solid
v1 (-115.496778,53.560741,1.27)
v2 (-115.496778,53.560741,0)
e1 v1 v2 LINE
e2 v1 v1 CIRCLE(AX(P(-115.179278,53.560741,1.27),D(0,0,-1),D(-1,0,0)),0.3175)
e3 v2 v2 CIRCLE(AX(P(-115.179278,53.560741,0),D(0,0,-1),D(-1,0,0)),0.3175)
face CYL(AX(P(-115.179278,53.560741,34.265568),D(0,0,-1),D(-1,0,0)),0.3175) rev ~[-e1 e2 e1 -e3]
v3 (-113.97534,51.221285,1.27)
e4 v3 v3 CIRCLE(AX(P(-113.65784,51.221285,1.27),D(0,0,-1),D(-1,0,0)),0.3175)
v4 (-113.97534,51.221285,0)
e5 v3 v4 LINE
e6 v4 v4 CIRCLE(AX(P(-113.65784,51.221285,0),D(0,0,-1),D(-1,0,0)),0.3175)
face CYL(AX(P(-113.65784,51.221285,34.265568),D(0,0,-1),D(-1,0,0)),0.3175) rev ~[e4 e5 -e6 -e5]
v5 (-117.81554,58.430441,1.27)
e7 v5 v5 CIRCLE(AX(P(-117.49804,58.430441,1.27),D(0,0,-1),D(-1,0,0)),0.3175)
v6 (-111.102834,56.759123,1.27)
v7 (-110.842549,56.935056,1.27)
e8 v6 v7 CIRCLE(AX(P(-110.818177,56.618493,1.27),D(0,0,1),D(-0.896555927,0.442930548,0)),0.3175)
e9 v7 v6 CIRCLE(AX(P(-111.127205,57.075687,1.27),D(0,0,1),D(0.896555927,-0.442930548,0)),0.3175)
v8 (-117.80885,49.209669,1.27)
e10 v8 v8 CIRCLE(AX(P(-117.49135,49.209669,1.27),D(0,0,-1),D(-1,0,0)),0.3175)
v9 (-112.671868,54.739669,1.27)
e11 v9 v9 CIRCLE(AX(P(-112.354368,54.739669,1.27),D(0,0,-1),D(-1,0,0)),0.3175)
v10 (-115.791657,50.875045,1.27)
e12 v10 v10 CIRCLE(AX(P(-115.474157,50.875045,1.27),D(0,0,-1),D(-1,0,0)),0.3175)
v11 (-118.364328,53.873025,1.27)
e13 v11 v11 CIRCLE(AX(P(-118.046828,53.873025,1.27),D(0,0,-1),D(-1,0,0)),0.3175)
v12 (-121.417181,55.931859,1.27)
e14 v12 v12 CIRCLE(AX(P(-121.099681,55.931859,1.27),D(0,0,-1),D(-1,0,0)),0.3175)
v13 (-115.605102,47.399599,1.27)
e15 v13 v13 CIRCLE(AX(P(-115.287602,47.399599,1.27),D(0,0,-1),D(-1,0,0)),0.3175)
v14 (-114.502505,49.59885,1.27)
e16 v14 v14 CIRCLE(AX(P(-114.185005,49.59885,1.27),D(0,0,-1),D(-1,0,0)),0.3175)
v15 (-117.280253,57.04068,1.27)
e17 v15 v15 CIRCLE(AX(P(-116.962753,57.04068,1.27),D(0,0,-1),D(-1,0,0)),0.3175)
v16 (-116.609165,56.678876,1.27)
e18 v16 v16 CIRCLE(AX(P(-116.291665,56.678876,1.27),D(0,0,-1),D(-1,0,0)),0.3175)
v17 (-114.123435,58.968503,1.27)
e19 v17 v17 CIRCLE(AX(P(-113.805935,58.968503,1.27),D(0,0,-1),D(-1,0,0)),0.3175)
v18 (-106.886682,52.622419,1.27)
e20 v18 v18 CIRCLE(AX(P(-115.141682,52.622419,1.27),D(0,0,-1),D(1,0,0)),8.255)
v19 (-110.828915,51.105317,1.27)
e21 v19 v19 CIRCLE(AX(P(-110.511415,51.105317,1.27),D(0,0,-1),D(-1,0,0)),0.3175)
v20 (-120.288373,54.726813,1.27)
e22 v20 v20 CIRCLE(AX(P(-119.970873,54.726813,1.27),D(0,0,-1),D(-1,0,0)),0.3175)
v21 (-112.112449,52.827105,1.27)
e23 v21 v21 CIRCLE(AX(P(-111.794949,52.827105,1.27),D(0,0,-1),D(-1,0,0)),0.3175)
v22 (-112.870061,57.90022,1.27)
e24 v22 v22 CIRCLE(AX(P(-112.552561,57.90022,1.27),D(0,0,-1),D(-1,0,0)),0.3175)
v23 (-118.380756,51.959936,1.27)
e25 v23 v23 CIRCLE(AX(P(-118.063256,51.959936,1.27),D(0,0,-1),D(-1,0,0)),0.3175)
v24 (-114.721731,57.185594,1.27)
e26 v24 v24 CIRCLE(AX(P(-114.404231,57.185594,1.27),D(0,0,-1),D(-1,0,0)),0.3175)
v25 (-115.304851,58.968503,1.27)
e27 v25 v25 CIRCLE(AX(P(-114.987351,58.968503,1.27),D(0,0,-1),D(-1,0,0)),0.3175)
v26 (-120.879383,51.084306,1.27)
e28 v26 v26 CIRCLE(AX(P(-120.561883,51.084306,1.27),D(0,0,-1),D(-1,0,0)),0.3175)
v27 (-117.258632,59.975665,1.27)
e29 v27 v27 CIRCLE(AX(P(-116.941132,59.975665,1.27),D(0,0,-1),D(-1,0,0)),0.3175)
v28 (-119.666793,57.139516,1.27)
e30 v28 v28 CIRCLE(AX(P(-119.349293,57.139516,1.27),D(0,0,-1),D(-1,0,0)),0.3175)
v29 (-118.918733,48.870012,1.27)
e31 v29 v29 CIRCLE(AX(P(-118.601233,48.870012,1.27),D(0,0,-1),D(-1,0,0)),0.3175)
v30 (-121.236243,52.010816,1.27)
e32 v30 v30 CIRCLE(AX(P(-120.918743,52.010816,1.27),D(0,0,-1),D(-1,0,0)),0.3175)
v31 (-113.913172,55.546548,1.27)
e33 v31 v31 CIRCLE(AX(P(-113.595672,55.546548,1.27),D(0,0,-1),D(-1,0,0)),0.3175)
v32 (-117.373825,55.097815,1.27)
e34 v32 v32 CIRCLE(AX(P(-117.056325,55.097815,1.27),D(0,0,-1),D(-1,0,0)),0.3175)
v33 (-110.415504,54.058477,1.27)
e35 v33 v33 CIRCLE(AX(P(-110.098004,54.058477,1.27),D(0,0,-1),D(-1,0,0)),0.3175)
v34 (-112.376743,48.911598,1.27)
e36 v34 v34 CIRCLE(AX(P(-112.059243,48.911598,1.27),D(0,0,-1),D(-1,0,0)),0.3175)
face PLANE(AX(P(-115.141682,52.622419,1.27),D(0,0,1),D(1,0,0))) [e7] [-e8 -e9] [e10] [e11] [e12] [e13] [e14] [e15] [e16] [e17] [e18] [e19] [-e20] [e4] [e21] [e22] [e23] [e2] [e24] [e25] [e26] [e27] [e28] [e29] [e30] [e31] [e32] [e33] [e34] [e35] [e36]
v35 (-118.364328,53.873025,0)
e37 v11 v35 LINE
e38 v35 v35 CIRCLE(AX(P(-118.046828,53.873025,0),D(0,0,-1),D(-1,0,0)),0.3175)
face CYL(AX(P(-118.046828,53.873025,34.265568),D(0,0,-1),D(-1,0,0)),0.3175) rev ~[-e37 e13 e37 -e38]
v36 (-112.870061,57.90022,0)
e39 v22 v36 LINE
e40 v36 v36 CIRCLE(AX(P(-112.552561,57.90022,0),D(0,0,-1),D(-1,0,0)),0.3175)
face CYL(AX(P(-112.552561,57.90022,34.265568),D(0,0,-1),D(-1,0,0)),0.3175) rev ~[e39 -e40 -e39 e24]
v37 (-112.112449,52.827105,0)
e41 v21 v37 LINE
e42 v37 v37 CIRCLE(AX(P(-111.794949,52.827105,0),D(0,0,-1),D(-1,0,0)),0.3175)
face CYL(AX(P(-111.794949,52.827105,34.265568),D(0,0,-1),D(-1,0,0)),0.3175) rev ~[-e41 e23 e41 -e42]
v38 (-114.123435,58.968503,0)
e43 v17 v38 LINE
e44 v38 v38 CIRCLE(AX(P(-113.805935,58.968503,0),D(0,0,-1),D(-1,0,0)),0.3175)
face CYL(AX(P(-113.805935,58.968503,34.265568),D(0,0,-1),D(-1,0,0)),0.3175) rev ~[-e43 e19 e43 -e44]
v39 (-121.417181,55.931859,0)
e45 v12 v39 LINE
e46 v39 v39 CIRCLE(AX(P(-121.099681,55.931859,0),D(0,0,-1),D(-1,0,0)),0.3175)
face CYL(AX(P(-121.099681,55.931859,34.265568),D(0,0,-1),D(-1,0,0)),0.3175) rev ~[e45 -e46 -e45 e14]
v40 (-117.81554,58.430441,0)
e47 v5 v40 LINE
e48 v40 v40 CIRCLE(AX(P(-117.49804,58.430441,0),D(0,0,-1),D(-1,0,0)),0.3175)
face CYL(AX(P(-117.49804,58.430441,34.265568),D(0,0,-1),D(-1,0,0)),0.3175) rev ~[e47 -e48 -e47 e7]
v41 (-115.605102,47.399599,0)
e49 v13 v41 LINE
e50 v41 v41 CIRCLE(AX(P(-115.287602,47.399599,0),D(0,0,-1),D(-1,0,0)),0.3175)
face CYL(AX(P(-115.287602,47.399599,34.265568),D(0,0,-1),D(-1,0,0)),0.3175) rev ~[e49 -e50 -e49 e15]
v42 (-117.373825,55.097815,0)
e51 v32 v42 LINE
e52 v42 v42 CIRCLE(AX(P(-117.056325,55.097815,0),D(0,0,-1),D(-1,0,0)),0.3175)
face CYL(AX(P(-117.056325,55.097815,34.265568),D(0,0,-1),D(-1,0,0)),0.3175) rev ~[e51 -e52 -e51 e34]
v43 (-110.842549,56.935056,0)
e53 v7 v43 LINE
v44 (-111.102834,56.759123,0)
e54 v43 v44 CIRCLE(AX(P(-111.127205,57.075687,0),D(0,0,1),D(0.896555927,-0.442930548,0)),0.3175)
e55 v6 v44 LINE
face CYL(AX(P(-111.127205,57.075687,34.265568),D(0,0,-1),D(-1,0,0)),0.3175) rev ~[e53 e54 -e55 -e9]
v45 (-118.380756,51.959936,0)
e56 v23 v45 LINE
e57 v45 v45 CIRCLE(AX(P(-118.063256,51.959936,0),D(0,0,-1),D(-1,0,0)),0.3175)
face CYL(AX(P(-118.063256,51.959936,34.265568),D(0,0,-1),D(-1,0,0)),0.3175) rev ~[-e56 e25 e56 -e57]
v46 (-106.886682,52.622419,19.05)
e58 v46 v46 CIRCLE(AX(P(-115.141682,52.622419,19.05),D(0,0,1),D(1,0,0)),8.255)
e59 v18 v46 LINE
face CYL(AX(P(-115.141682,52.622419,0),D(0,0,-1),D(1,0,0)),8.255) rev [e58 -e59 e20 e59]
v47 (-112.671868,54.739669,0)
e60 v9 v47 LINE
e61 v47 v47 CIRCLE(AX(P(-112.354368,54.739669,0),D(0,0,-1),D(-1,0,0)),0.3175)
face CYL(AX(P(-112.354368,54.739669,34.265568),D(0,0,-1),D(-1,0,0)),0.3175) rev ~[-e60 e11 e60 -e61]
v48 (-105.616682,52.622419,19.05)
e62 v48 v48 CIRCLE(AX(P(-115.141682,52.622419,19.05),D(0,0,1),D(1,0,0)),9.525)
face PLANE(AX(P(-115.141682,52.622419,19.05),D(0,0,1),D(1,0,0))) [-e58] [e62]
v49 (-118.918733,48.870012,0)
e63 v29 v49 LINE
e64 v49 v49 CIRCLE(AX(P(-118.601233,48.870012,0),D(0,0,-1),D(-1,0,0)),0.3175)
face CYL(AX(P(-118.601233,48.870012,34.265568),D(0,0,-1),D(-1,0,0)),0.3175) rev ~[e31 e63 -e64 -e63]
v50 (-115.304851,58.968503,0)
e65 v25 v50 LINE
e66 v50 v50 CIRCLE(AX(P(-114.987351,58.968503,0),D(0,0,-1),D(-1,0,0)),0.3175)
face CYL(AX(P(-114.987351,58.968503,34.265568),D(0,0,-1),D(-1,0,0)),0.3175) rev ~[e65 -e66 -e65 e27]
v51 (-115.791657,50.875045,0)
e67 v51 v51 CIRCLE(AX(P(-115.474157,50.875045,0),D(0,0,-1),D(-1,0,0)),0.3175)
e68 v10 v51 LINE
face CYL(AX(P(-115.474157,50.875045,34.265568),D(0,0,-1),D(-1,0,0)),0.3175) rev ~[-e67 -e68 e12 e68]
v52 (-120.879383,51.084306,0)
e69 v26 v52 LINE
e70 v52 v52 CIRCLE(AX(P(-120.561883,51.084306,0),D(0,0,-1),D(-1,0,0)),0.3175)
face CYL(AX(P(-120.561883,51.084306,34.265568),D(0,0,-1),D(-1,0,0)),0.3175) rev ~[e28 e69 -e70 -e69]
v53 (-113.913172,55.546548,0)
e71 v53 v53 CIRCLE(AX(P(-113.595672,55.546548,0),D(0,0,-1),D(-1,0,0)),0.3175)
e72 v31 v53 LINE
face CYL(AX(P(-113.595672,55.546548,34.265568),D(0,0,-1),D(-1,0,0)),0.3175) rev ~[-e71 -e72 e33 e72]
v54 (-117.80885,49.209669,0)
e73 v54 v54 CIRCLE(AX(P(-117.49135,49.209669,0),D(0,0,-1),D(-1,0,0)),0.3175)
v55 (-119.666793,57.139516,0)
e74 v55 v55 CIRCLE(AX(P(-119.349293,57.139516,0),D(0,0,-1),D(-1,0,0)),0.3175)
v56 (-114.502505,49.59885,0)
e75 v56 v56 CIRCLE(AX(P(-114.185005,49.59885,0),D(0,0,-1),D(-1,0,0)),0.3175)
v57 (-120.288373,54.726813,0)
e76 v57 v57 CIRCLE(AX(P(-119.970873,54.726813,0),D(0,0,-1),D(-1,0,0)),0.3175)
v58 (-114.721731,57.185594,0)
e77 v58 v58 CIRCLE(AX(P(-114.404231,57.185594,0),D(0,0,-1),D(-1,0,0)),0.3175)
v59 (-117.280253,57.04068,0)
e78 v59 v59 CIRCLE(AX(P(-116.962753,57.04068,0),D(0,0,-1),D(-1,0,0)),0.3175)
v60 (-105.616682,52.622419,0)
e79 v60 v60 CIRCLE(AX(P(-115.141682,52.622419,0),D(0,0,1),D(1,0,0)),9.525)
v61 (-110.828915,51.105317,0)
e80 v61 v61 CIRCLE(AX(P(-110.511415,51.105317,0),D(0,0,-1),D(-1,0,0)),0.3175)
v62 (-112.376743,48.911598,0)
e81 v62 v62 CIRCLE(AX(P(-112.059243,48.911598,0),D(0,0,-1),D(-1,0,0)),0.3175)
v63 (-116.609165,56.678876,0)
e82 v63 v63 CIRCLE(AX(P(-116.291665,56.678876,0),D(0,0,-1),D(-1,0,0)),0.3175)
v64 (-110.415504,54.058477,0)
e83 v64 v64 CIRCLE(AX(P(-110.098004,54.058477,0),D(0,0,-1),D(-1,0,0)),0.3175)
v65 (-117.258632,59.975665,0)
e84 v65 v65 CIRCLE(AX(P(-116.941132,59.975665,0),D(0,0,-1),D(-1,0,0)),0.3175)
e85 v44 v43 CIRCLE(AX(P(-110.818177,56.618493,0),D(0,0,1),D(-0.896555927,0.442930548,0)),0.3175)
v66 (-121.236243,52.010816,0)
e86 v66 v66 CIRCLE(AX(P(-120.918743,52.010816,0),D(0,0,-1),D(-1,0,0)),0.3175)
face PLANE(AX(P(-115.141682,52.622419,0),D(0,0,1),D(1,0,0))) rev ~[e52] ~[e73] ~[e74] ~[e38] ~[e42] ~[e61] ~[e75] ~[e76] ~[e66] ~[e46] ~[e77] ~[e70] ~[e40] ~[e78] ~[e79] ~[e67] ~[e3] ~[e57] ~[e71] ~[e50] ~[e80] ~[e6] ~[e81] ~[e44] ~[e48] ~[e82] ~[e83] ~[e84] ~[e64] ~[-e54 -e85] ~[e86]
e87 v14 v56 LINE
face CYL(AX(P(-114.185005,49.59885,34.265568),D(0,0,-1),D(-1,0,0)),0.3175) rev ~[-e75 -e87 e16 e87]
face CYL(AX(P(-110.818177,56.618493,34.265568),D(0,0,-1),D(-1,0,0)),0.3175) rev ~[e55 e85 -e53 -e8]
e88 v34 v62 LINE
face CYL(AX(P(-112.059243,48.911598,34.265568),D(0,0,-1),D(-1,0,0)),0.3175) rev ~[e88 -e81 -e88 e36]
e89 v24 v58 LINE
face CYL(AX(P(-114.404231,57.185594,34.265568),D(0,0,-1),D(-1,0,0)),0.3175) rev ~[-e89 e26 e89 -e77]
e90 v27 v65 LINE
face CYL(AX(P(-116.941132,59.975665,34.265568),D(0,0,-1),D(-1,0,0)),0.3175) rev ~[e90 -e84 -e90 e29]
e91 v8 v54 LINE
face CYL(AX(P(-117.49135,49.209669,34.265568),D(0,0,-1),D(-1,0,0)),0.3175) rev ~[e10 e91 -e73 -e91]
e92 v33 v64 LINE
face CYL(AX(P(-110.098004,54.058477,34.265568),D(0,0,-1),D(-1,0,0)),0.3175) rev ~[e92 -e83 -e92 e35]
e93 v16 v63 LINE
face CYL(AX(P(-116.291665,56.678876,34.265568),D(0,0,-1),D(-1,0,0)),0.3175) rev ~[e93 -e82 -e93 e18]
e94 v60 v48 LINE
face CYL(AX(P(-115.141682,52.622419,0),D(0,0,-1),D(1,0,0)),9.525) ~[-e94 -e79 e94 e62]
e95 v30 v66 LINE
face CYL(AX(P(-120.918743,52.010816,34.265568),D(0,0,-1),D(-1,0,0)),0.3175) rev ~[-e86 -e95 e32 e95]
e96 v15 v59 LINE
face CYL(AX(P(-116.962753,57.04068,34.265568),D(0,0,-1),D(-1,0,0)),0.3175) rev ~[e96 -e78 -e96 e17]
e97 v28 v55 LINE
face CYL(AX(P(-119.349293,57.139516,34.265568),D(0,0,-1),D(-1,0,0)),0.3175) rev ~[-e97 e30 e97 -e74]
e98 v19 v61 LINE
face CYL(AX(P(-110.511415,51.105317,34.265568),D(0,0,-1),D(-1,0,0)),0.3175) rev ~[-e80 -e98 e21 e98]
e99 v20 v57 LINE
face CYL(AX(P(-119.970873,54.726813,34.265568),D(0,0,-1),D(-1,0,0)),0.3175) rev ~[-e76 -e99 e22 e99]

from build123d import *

# Parameters (mm, degrees)
F0_R     = 9.525
F1_DEPTH = 19.05
F2_T     = -1.27
F4_D     = 0.635


# Not quite as in the source:
# - the program builds the solid bodies; features that only make, move or delete a surface that nothing else refers to are left out


with BuildPart() as f1:
    # F0 (on Top) → F1 (new body)
    with BuildSketch(Plane.XY):
        with Locations((-115.1416823268, 52.6224188507)):
            Circle(F0_R)
    extrude(amount=F1_DEPTH)

    # F2
    f2_openings = [f1.faces().sort_by_distance(p)[0] for p in [
        (-115.141682, 52.622419, 19.05),
    ]]
    offset(amount=F2_T, openings=f2_openings)

    # F4 (through all)
    with Locations(Plane.XY.offset(1.27)):
        with Locations((-116.9411316514, 59.9756650627), (-114.9873510003, 58.9685030282), (-113.8059347868, 58.9685030282), (-117.4980401993, 58.4304407239), (-119.3492934108, 57.1395158768), (-121.0996806622, 55.9318587184), (-119.9708729982, 54.7268129885), (-116.9627532363, 57.0406801999), (-116.2916645408, 56.6788762808), (-117.056325078, 55.0978146493), (-118.0468276143, 53.8730248809), (-120.9187433124, 52.0108155906), (-120.5618828535, 51.0843060911), (-118.0632561445, 51.9599355757), (-118.6012327671, 48.8700121641), (-117.4913495779, 49.2096692324), (-115.4741570354, 50.8750453591), (-115.1792779565, 53.5607412457), (-114.4042313099, 57.1855939925), (-113.5956719518, 55.5465482175), (-111.127205193, 57.0756867528), (-110.8181774616, 56.6184930503), (-112.3543679714, 54.7396689653), (-111.7949485779, 52.8271049261), (-110.0980043411, 54.0584772825), (-110.5114147067, 51.1053167284), (-113.6578395963, 51.2212850153), (-114.1850054264, 49.5988503098), (-112.0592430234, 48.9115975797), (-115.2876019478, 47.3995991051), (-112.5525608659, 57.9002201557)):
            Hole(F4_D / 2)


solid = f1.part
